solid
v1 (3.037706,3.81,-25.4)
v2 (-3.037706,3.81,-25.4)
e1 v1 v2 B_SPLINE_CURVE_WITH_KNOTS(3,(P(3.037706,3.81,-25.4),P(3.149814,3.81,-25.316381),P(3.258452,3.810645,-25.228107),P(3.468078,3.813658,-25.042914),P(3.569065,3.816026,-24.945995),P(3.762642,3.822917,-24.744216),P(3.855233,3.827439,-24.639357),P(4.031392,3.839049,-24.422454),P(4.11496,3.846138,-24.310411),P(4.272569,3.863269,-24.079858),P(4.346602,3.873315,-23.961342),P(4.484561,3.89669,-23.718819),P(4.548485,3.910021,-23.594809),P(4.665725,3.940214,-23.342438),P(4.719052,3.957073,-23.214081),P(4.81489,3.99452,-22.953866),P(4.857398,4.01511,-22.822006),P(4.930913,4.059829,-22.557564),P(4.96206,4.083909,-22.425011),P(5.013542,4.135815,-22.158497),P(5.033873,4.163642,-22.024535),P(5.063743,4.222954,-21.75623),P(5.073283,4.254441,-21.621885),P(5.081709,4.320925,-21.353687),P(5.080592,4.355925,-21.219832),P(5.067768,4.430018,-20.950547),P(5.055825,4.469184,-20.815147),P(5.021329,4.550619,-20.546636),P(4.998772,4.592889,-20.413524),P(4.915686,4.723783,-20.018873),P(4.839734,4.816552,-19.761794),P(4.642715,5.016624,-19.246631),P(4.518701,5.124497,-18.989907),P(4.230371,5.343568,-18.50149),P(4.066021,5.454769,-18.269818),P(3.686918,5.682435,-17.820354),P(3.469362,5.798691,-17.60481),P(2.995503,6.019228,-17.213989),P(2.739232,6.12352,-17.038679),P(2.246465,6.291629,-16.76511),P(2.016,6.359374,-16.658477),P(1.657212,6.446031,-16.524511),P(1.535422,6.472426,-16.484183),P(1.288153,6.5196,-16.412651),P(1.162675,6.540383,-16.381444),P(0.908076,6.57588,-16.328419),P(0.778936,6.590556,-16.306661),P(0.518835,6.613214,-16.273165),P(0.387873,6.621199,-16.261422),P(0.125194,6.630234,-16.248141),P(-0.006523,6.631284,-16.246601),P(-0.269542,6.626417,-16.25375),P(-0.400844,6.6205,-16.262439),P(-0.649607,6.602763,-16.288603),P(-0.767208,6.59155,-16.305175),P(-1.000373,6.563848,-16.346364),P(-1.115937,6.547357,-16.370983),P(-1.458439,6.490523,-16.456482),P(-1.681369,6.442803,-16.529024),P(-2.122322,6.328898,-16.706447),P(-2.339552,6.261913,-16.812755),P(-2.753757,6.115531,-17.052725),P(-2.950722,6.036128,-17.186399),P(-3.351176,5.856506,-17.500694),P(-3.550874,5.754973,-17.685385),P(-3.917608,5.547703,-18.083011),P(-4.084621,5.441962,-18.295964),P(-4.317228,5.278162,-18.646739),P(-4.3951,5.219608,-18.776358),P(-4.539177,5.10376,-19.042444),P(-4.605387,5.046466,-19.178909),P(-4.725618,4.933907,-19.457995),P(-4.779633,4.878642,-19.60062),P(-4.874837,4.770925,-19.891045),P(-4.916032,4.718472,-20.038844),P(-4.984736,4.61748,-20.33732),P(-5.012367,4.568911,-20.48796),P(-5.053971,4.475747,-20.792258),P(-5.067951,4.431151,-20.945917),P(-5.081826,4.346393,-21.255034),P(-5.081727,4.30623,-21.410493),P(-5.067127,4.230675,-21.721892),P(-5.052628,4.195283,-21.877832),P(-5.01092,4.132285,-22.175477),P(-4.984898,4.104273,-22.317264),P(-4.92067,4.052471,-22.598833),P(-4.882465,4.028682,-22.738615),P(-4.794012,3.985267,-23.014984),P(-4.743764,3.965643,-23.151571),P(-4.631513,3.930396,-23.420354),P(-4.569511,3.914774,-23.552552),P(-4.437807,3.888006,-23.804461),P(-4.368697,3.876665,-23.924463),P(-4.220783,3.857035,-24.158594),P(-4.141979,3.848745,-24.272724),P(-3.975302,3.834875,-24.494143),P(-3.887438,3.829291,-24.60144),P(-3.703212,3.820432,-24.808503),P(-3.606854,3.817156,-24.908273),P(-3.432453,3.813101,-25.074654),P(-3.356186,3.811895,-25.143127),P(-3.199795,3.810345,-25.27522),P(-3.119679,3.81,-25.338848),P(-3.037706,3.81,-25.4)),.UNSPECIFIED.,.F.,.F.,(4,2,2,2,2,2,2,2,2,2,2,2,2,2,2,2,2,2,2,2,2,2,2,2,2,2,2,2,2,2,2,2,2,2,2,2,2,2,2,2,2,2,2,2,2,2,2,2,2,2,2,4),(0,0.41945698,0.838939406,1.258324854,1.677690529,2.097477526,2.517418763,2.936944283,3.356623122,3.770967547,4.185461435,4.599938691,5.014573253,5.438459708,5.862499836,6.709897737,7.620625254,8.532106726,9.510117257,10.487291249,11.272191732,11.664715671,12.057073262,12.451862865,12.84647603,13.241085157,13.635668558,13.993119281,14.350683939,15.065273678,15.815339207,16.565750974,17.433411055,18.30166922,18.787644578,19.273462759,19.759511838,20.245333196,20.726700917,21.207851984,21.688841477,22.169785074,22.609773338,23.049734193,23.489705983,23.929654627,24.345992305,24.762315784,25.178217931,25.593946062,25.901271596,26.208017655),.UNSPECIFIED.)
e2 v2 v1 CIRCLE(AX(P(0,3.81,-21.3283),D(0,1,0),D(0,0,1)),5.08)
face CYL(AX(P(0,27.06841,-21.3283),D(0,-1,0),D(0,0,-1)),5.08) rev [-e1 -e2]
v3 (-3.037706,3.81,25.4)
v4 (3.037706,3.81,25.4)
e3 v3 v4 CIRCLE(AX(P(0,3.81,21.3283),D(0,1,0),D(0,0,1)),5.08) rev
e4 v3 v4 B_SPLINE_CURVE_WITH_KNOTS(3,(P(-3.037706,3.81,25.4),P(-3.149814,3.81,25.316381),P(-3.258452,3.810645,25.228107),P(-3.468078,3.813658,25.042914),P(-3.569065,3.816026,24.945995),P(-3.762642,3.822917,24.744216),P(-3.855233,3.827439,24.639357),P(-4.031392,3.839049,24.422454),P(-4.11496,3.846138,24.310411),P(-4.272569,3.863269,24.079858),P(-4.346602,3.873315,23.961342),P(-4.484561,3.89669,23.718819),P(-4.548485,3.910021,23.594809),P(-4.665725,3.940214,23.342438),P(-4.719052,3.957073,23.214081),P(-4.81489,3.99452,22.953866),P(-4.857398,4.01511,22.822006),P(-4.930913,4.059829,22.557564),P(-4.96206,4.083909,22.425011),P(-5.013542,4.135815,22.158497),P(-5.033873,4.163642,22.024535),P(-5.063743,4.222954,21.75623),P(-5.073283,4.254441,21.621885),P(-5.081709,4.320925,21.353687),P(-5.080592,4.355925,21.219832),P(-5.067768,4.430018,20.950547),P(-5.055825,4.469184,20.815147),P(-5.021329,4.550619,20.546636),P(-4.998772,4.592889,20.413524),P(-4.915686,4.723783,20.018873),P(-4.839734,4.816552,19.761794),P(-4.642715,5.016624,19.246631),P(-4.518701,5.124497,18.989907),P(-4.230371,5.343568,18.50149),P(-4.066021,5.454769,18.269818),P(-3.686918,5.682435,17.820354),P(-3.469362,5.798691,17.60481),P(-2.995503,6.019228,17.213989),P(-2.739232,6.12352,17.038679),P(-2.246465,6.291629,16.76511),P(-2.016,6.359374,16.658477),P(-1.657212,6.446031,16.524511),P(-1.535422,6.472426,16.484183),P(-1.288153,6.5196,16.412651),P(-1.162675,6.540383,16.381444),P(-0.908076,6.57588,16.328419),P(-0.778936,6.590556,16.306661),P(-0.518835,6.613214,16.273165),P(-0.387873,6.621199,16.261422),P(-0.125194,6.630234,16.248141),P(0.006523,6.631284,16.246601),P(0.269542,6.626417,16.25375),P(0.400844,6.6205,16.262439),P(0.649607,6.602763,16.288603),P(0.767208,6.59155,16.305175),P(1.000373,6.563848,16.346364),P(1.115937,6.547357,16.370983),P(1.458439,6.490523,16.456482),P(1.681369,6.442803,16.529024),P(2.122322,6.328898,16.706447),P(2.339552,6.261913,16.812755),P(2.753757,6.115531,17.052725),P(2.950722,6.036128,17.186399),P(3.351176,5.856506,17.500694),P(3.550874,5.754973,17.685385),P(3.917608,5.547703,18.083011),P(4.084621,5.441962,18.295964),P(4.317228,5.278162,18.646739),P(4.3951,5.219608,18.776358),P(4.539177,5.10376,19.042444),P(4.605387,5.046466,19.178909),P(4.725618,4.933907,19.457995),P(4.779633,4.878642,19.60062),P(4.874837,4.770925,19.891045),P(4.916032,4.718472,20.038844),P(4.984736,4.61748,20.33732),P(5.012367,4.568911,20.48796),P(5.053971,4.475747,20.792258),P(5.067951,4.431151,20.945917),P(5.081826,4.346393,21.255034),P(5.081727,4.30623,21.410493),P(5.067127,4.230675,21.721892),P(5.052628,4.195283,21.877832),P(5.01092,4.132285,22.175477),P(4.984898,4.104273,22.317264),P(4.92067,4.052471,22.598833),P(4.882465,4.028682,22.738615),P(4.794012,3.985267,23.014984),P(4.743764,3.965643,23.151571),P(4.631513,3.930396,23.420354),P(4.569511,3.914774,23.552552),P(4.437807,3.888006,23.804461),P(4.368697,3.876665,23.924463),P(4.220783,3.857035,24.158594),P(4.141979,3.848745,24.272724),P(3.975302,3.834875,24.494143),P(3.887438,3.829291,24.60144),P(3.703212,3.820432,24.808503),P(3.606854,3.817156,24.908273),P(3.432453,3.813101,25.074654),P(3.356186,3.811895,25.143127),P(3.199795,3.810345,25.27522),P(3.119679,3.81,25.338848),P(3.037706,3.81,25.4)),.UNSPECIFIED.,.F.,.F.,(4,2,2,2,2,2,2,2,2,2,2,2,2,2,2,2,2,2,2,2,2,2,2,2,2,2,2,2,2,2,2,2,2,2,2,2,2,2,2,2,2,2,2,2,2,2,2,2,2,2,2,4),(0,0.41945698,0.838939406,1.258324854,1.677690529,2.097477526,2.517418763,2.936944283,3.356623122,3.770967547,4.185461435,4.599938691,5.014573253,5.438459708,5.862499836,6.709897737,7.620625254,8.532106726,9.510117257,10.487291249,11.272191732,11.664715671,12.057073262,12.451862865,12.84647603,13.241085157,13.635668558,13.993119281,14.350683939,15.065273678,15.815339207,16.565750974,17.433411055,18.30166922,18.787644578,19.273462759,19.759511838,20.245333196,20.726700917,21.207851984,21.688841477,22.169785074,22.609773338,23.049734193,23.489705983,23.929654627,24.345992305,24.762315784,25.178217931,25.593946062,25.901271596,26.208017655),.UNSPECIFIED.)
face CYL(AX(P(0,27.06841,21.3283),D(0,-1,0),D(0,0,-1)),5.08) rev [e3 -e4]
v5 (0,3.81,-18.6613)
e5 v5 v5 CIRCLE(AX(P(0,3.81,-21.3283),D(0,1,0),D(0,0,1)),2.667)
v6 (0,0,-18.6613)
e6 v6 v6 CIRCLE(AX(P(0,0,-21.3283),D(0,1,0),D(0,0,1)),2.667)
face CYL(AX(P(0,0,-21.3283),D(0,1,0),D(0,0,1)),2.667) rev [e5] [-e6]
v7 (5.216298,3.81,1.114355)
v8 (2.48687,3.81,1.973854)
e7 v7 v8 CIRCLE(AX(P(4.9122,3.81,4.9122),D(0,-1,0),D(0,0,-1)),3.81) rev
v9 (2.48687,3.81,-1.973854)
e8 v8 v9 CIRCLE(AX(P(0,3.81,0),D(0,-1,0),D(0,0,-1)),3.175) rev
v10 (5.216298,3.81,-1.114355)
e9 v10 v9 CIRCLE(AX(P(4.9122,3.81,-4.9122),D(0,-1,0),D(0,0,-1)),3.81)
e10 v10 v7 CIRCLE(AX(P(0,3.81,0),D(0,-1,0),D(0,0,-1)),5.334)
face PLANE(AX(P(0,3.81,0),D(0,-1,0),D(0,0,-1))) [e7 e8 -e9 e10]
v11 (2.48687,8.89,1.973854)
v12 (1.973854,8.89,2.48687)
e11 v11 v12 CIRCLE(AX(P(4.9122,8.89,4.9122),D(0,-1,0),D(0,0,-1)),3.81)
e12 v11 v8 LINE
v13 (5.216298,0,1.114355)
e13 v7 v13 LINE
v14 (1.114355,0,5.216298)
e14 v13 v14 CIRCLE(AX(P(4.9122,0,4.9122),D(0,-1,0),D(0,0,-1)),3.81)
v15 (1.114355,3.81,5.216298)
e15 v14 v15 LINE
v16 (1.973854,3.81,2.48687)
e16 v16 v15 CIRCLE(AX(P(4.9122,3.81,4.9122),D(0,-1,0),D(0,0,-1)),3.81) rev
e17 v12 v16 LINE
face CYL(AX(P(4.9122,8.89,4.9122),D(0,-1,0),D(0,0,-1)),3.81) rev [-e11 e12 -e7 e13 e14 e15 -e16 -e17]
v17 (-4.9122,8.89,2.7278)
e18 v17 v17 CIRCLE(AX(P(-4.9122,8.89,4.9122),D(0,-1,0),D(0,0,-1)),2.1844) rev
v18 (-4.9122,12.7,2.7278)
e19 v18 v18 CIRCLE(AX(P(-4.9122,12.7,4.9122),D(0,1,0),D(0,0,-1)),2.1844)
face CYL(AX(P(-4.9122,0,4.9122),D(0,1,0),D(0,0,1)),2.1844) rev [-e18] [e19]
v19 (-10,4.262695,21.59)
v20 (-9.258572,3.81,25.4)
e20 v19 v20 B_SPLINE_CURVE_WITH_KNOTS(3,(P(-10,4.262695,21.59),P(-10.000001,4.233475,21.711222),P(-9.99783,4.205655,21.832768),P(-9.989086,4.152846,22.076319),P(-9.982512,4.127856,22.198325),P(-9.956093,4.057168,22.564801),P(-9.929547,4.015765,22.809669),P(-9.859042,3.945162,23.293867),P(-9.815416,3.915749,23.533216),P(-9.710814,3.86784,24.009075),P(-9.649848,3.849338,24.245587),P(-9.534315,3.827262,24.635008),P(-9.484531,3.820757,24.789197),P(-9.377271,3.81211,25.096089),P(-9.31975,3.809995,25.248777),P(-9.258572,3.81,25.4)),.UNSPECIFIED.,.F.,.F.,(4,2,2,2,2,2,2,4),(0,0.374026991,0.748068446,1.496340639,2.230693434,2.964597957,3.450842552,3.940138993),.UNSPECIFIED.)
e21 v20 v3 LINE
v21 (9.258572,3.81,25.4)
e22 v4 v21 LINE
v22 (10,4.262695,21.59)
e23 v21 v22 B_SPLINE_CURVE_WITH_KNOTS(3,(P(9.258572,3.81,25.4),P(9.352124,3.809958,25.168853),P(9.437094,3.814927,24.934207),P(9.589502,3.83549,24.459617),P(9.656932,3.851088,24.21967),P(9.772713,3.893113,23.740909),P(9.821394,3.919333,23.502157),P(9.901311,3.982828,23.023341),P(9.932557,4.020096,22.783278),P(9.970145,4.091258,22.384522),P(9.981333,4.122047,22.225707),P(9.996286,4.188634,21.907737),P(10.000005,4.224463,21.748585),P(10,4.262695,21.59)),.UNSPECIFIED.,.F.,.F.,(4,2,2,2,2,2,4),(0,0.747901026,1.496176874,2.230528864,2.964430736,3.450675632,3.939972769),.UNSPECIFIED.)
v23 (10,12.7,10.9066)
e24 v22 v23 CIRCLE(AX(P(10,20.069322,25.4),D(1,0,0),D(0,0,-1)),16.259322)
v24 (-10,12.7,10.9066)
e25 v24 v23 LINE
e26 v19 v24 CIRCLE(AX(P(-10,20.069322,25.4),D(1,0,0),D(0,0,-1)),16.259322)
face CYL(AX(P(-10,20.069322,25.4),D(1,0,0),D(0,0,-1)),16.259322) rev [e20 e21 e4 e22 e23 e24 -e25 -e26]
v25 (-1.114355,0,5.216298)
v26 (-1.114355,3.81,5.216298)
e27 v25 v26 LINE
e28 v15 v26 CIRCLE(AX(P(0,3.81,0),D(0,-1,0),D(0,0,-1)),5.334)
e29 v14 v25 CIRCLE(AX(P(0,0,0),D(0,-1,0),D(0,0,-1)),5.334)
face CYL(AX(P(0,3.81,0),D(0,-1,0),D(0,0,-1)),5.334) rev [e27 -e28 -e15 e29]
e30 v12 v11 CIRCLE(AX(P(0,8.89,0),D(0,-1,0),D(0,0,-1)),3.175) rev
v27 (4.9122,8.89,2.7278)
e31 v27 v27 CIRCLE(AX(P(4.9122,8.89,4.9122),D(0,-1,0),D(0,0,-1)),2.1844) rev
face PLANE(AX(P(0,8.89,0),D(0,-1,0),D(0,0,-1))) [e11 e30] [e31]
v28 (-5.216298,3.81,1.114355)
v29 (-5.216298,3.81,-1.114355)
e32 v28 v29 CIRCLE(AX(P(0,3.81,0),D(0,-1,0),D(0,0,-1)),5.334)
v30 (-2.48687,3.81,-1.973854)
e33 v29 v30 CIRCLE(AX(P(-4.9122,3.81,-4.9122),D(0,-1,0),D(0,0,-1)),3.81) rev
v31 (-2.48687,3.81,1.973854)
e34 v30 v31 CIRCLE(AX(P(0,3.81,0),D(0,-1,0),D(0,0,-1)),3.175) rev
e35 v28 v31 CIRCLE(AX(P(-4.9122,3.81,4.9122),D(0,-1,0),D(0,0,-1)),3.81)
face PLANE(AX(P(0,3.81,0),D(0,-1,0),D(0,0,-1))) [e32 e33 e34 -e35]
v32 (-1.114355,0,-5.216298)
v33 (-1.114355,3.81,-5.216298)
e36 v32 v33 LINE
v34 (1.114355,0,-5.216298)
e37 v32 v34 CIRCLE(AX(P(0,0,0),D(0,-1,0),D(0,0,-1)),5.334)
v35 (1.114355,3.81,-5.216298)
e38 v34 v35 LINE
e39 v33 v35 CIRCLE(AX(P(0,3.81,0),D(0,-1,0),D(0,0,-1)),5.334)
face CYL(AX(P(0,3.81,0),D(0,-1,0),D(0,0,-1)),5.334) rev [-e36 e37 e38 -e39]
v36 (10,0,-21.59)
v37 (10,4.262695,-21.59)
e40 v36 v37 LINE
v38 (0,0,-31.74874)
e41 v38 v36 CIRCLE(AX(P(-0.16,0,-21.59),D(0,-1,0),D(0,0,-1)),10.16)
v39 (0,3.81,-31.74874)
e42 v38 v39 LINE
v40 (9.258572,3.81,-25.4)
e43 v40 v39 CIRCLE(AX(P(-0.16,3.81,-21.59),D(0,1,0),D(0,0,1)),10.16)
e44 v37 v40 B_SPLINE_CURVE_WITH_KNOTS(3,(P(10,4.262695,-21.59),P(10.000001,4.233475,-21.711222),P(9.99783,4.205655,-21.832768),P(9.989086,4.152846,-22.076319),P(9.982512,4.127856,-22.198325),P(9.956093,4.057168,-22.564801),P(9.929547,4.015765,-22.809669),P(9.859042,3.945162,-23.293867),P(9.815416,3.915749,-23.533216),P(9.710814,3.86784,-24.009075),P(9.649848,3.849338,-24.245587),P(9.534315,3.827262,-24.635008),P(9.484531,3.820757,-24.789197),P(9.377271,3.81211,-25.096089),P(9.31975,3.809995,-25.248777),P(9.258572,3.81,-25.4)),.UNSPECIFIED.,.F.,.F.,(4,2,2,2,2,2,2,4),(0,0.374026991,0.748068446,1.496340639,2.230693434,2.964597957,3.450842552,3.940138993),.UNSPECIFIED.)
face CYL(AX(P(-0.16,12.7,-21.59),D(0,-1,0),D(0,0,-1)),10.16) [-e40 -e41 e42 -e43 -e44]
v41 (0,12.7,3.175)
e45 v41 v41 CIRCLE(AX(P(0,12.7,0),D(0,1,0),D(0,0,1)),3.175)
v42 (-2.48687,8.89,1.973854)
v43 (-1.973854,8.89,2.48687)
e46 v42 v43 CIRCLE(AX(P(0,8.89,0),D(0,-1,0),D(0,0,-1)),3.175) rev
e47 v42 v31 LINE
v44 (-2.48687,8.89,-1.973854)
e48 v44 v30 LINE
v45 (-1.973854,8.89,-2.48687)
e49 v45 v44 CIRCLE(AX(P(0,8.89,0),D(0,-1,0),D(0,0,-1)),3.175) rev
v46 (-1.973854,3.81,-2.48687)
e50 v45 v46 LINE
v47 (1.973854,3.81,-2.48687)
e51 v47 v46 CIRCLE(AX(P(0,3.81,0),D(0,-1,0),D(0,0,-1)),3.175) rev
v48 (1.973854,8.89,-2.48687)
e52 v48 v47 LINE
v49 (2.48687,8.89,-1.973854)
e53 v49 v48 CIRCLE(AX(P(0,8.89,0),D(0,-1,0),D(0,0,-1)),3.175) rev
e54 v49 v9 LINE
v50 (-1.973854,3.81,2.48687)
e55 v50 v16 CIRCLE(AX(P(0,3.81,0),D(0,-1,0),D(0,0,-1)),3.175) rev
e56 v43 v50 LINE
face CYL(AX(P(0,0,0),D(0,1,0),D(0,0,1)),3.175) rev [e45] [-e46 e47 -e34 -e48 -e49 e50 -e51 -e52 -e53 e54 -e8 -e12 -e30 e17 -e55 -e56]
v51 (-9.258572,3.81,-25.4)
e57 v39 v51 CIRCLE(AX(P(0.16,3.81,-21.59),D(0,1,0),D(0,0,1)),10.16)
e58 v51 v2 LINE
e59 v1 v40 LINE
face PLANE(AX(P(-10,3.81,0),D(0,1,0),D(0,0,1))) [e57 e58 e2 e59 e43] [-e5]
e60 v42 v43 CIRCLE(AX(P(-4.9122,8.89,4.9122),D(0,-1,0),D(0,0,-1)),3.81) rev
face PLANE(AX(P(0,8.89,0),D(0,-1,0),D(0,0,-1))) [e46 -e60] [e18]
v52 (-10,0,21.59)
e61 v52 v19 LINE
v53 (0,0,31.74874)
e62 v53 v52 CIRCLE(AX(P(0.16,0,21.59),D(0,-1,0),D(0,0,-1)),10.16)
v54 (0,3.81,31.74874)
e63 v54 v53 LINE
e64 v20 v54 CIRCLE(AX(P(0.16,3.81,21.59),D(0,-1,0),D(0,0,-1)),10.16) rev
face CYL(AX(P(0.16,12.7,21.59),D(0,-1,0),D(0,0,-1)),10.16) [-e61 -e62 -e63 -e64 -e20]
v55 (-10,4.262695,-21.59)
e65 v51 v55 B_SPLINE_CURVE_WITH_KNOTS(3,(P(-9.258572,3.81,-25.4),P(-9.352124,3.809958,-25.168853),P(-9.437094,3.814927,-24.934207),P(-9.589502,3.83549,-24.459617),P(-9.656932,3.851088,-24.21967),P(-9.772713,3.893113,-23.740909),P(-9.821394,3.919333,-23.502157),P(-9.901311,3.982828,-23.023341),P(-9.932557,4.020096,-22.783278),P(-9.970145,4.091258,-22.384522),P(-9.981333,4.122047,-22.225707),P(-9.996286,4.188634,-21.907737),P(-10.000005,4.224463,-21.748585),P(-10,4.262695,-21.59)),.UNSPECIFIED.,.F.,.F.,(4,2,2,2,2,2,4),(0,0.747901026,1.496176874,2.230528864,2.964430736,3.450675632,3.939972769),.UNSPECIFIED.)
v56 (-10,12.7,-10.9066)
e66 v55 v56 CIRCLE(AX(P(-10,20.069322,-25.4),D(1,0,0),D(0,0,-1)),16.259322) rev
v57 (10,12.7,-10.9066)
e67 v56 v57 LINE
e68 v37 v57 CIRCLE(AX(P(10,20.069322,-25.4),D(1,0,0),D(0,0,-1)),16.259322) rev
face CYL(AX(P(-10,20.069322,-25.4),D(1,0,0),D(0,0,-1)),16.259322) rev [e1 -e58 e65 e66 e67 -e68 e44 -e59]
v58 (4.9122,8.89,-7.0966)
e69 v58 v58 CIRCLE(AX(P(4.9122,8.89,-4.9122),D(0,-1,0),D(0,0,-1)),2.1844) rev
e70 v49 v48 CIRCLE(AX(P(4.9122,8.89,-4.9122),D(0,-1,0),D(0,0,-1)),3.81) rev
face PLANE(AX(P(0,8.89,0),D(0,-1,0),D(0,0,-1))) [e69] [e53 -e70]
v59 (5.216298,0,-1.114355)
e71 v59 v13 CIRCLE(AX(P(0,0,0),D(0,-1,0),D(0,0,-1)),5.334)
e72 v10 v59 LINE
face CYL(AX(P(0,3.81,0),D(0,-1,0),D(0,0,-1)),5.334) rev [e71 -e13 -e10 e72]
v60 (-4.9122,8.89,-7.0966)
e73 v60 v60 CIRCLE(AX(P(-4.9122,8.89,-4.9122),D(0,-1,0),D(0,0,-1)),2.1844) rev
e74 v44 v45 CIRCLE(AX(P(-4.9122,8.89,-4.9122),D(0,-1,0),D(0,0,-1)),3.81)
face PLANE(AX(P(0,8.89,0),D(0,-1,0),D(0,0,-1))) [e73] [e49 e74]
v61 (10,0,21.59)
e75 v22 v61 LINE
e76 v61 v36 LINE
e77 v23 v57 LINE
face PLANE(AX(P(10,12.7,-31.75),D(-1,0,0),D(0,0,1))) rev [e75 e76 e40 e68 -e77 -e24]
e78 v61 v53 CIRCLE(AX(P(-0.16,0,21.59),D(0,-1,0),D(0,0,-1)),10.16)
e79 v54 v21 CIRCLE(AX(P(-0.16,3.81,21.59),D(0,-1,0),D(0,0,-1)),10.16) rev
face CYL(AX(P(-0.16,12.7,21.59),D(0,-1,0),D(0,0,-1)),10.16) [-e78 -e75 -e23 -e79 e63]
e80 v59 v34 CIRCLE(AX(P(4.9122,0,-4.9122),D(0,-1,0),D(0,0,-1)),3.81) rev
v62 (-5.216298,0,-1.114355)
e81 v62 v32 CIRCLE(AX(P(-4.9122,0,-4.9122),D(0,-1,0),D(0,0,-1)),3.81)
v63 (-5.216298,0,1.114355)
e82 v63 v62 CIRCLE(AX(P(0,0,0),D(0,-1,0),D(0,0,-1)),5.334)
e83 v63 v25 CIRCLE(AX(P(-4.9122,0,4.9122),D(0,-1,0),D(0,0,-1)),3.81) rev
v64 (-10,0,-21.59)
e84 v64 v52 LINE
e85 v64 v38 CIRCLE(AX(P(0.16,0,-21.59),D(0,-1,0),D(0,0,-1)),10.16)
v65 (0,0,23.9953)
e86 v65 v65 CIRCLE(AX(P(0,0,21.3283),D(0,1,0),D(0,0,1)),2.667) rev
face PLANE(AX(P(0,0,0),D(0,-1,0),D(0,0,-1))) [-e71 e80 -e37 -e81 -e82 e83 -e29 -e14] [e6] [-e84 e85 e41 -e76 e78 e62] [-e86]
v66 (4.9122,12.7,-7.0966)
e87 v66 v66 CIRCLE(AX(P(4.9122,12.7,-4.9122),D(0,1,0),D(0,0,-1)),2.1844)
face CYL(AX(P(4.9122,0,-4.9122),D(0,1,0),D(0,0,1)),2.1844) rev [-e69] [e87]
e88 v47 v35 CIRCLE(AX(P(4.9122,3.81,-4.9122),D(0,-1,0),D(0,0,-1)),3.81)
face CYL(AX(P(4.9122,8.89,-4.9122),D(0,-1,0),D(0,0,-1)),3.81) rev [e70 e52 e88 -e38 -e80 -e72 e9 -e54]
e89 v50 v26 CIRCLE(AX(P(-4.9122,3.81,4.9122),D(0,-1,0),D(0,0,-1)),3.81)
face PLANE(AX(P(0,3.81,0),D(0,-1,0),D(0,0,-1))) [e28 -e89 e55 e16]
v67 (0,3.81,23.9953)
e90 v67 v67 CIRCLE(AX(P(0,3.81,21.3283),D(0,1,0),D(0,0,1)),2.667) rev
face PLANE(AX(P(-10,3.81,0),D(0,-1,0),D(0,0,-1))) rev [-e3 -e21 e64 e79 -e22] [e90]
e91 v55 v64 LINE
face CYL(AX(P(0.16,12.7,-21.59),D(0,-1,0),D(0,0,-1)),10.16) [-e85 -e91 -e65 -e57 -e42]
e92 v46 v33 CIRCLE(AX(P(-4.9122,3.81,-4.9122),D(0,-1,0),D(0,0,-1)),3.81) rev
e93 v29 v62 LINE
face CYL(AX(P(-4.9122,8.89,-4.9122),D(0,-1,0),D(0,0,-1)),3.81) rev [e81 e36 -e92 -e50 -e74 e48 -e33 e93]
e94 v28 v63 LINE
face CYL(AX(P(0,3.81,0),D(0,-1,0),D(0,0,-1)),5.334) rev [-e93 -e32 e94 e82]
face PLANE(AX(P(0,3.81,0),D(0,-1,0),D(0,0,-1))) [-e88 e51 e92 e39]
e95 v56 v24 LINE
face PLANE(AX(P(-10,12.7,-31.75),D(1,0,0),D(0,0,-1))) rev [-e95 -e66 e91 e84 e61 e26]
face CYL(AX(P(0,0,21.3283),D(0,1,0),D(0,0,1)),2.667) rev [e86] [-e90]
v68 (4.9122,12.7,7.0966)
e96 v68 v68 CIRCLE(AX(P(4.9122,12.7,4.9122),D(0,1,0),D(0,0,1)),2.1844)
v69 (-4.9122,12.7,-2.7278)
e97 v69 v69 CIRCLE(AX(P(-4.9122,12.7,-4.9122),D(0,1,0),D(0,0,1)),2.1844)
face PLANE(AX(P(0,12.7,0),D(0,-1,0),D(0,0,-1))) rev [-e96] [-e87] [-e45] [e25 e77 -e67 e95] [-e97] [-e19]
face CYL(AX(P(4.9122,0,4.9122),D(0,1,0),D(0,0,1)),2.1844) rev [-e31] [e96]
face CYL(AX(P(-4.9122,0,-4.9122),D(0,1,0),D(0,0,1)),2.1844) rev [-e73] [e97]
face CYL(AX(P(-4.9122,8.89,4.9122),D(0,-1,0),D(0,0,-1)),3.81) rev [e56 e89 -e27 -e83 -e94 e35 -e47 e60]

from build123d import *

# Parameters (mm, degrees)
SKETCH1_W               = 20
SKETCH1_H               = 63.5
BOSS_EXTRUDE1_DEPTH     = 12.7
SKETCH2_R               = 3.175
SKETCH2_R_2             = 2.1844
CUT_EXTRUDE1_DEPTH      = 36.62797356
CUT_EXTRUDE2_DEPTH      = 36.62797356
CUT_EXTRUDE2_DEPTH_BACK = 36.62797356
SKETCH4_R               = 3.81
CUT_EXTRUDE3_DEPTH      = 8.89
SKETCH4_3_R             = 3.81
SKETCH4_3_R_2           = 2.1844
SKETCH4_3_R_3           = 5.334
SKETCH4_3_R_4           = 3.175
CUT_EXTRUDE4_DEPTH      = 3.81
SKETCH6_R               = 5.08
SKETCH6_R_2             = 2.667
CUT_EXTRUDE5_DEPTH      = 8.89
SKETCH6_4_R             = 2.667
CUT_EXTRUDE6_DEPTH      = 35.454239272
FILLET1_R               = 10.16


with BuildPart() as part:
    # Sketch1 → Boss-Extrude1 (new body)
    with BuildSketch(Plane(origin=(0, 0, 0), x_dir=(1, 0, 0), z_dir=(0, 1, 0))):
        Rectangle(SKETCH1_W, SKETCH1_H)
    extrude(amount=BOSS_EXTRUDE1_DEPTH)

    # Sketch2 → Cut-Extrude1 (cut, through all)
    with BuildSketch(Plane(origin=(0, 12.7, 0), x_dir=(1, 0, 0), z_dir=(0, 1, 0))):
        with Locations(Location((0, 0, 0), (0, 0, 270))):
            Circle(SKETCH2_R)
        with Locations(Location((-4.912200098, 4.912200098, 0), (0, 0, 270))):
            Circle(SKETCH2_R_2)
        with Locations(Location((4.912200098, -4.912200098, 0), (0, 0, 270))):
            Circle(SKETCH2_R_2)
        with Locations(Location((4.912200098, 4.912200098, 0), (0, 0, 90))):
            Circle(SKETCH2_R_2)
        with Locations(Location((-4.912200098, -4.912200098, 0), (0, 0, 90))):
            Circle(SKETCH2_R_2)
    extrude(amount=-CUT_EXTRUDE1_DEPTH, mode=Mode.SUBTRACT)

    # Sketch3 → Cut-Extrude2 (cut, two sides: drawn at the far end of the back side and taken through both)
    with BuildSketch(Plane(origin=(0, 0, 0), x_dir=(0, 0, -1), z_dir=(1, 0, 0)).offset(-CUT_EXTRUDE2_DEPTH_BACK)):
        with BuildLine():
            Line((31.75, 3.81), (31.75, 12.7))
            Line((31.75, 12.7), (10.906600098, 12.7))
            ThreePointArc((10.906600098, 12.7), (16.898665682, 6.209564949), (25.4, 3.81))
            Line((25.4, 3.81), (31.75, 3.81))
        make_face()
        with BuildLine():
            ThreePointArc((-25.4, 3.81), (-16.898665682, 6.209564949), (-10.906600098, 12.7))
            Line((-10.906600098, 12.7), (-31.75, 12.7))
            Line((-31.75, 12.7), (-31.75, 3.81))
            Line((-31.75, 3.81), (-25.4, 3.81))
        make_face()
    extrude(amount=CUT_EXTRUDE2_DEPTH + CUT_EXTRUDE2_DEPTH_BACK, mode=Mode.SUBTRACT)

    # Sketch4 → Cut-Extrude3 (cut)
    with BuildSketch(Plane.XZ):
        with Locations((-4.912200098, -4.912200098)):
            Circle(SKETCH4_R)
        with Locations((4.912200098, 4.912200098)):
            Circle(SKETCH4_R)
        with Locations((-4.912200098, 4.912200098)):
            Circle(SKETCH4_R)
        with Locations((4.912200098, -4.912200098)):
            Circle(SKETCH4_R)
    extrude(amount=-CUT_EXTRUDE3_DEPTH, mode=Mode.SUBTRACT)

    # Sketch4<3> → Cut-Extrude4 (cut)
    # profile 1 of 28: a face of its own
    with BuildSketch(Plane.XZ):
        with Locations((-4.912200098, 4.912200098)):
            Circle(SKETCH4_3_R)
        with Locations(Location((-4.912200098, 4.912200098, 0), (0, 0, 270))):
            Circle(SKETCH4_3_R_2, mode=Mode.SUBTRACT)
    # profile 2 of 28: a face of its own
    with BuildSketch(Plane.XZ):
        Circle(SKETCH4_3_R_3)
        with Locations(Location((0, 0, 0), (0, 0, 90))):
            Circle(SKETCH4_3_R_4, mode=Mode.SUBTRACT)
    # profile 3 of 28: a face of its own
    with BuildSketch(Plane.XZ):
        Circle(SKETCH4_3_R_3)
    # profile 4 of 28: a face of its own
    with BuildSketch(Plane.XZ):
        with Locations(Location((-4.912200098, 4.912200098, 0), (0, 0, 270))):
            Circle(SKETCH4_3_R_2)
    # profile 5 of 28: a face of its own
    with BuildSketch(Plane.XZ):
        with Locations((-4.912200098, 4.912200098)):
            Circle(SKETCH4_3_R)
    # profile 6 of 28: a face of its own
    with BuildSketch(Plane.XZ):
        Circle(SKETCH4_3_R_3)
        with Locations(Location((0, 0, 0), (0, 0, 90))):
            Circle(SKETCH4_3_R_4, mode=Mode.SUBTRACT)
    # profile 7 of 28: a face of its own
    with BuildSketch(Plane.XZ):
        with Locations((-4.912200098, -4.912200098)):
            Circle(SKETCH4_3_R)
    # profile 8 of 28: a face of its own
    with BuildSketch(Plane.XZ):
        Circle(SKETCH4_3_R_3)
        with Locations(Location((0, 0, 0), (0, 0, 90))):
            Circle(SKETCH4_3_R_4, mode=Mode.SUBTRACT)
    # profile 9 of 28: a face of its own
    with BuildSketch(Plane.XZ):
        with Locations((-4.912200098, -4.912200098)):
            Circle(SKETCH4_3_R)
        with Locations(Location((-4.912200098, -4.912200098, 0), (0, 0, 90))):
            Circle(SKETCH4_3_R_2, mode=Mode.SUBTRACT)
    # profile 10 of 28: a face of its own
    with BuildSketch(Plane.XZ):
        Circle(SKETCH4_3_R_3)
    # profile 11 of 28: a face of its own
    with BuildSketch(Plane.XZ):
        with Locations(Location((-4.912200098, -4.912200098, 0), (0, 0, 90))):
            Circle(SKETCH4_3_R_2)
    # profile 12 of 28: a face of its own
    with BuildSketch(Plane.XZ):
        with BuildLine():
            ThreePointArc((1.973854475, -2.486870224), (1.04518229, -2.998035854), (0, -3.175))
            Line((0, -3.175), (0, -5.334))
            ThreePointArc((0, -5.334), (0.560277089, -5.304492962), (1.114355409, -5.216298306))
            ThreePointArc((1.114355409, -5.216298306), (1.278123958, -3.767826643), (1.973854475, -2.486870224))
        make_face()
    # profile 13 of 28: a face of its own
    with BuildSketch(Plane.XZ):
        with BuildLine():
            Line((0, -5.334), (0, -3.175))
            ThreePointArc((0, -3.175), (-1.04518229, -2.998035854), (-1.973854475, -2.486870224))
            ThreePointArc((-1.973854475, -2.486870224), (-1.326729639, -3.623595587), (-1.102200098, -4.912200098))
            ThreePointArc((-1.102200098, -4.912200098), (-1.105240139, -5.064370621), (-1.114355409, -5.216298306))
            ThreePointArc((-1.114355409, -5.216298306), (-0.560277089, -5.304492962), (0, -5.334))
        make_face()
    # profile 14 of 28: a face of its own
    with BuildSketch(Plane.XZ):
        with Locations((4.912200098, -4.912200098)):
            Circle(SKETCH4_3_R)
        with Locations(Location((4.912200098, -4.912200098, 0), (0, 0, 270))):
            Circle(SKETCH4_3_R_2, mode=Mode.SUBTRACT)
    # profile 15 of 28: a face of its own
    with BuildSketch(Plane.XZ):
        Circle(SKETCH4_3_R_3)
        with Locations(Location((0, 0, 0), (0, 0, 90))):
            Circle(SKETCH4_3_R_4, mode=Mode.SUBTRACT)
    # profile 16 of 28: a face of its own
    with BuildSketch(Plane.XZ):
        Circle(SKETCH4_3_R_3)
    # profile 17 of 28: a face of its own
    with BuildSketch(Plane.XZ):
        with Locations(Location((4.912200098, -4.912200098, 0), (0, 0, 270))):
            Circle(SKETCH4_3_R_2)
    # profile 18 of 28: a face of its own
    with BuildSketch(Plane.XZ):
        with Locations((4.912200098, -4.912200098)):
            Circle(SKETCH4_3_R)
    # profile 19 of 28: a face of its own
    with BuildSketch(Plane.XZ):
        Circle(SKETCH4_3_R_3)
        with Locations(Location((0, 0, 0), (0, 0, 90))):
            Circle(SKETCH4_3_R_4, mode=Mode.SUBTRACT)
    # profile 20 of 28: a face of its own
    with BuildSketch(Plane.XZ):
        with Locations((4.912200098, 4.912200098)):
            Circle(SKETCH4_3_R)
    # profile 21 of 28: a face of its own
    with BuildSketch(Plane.XZ):
        Circle(SKETCH4_3_R_3)
        with Locations(Location((0, 0, 0), (0, 0, 90))):
            Circle(SKETCH4_3_R_4, mode=Mode.SUBTRACT)
    # profile 22 of 28: a face of its own
    with BuildSketch(Plane.XZ):
        with Locations((4.912200098, 4.912200098)):
            Circle(SKETCH4_3_R)
        with Locations(Location((4.912200098, 4.912200098, 0), (0, 0, 90))):
            Circle(SKETCH4_3_R_2, mode=Mode.SUBTRACT)
    # profile 23 of 28: a face of its own
    with BuildSketch(Plane.XZ):
        Circle(SKETCH4_3_R_3)
    # profile 24 of 28: a face of its own
    with BuildSketch(Plane.XZ):
        with Locations(Location((4.912200098, 4.912200098, 0), (0, 0, 90))):
            Circle(SKETCH4_3_R_2)
    # profile 25 of 28: a face of its own
    with BuildSketch(Plane.XZ):
        with BuildLine():
            Line((0, 3.175), (0, 5.334))
            ThreePointArc((0, 5.334), (-0.560277089, 5.304492962), (-1.114355409, 5.216298306))
            ThreePointArc((-1.114355409, 5.216298306), (-1.105240139, 5.064370621), (-1.102200098, 4.912200098))
            ThreePointArc((-1.102200098, 4.912200098), (-1.326729639, 3.623595587), (-1.973854475, 2.486870224))
            ThreePointArc((-1.973854475, 2.486870224), (-1.04518229, 2.998035854), (0, 3.175))
        make_face()
    # profile 26 of 28: a face of its own
    with BuildSketch(Plane.XZ):
        with BuildLine():
            ThreePointArc((1.114355409, 5.216298306), (0.560277089, 5.304492962), (0, 5.334))
            Line((0, 5.334), (0, 3.175))
            ThreePointArc((0, 3.175), (1.04518229, 2.998035854), (1.973854475, 2.486870224))
            ThreePointArc((1.973854475, 2.486870224), (1.278123958, 3.767826643), (1.114355409, 5.216298306))
        make_face()
    # profile 27 of 28: a face of its own
    with BuildSketch(Plane.XZ):
        with BuildLine():
            ThreePointArc((1.973854475, 2.486870224), (1.04518229, 2.998035854), (0, 3.175))
            Line((0, 3.175), (0, -3.175))
            ThreePointArc((0, -3.175), (1.04518229, -2.998035854), (1.973854475, -2.486870224))
            ThreePointArc((1.973854475, -2.486870224), (2.218123262, -2.218123262), (2.486870224, -1.973854475))
            ThreePointArc((2.486870224, -1.973854475), (2.998035854, -1.04518229), (3.175, 0))
            ThreePointArc((3.175, 0), (2.998035854, 1.04518229), (2.486870224, 1.973854475))
            ThreePointArc((2.486870224, 1.973854475), (2.218123262, 2.218123262), (1.973854475, 2.486870224))
        make_face()
    # profile 28 of 28: a face of its own
    with BuildSketch(Plane.XZ):
        with BuildLine():
            Line((0, -3.175), (0, 3.175))
            ThreePointArc((0, 3.175), (-1.04518229, 2.998035854), (-1.973854475, 2.486870224))
            ThreePointArc((-1.973854475, 2.486870224), (-2.218123262, 2.218123262), (-2.486870224, 1.973854475))
            ThreePointArc((-2.486870224, 1.973854475), (-3.175, 0), (-2.486870224, -1.973854475))
            ThreePointArc((-2.486870224, -1.973854475), (-2.218123262, -2.218123262), (-1.973854475, -2.486870224))
            ThreePointArc((-1.973854475, -2.486870224), (-1.04518229, -2.998035854), (0, -3.175))
        make_face()
    extrude(amount=-CUT_EXTRUDE4_DEPTH, mode=Mode.SUBTRACT)

    # Sketch6 → Cut-Extrude5 (cut)
    # profile 1 of 3: a face of its own
    with BuildSketch(Plane(origin=(0, 3.81, 0), x_dir=(1, 0, 0), z_dir=(0, 1, 0))):
        with Locations((0, -21.328300049)):
            Circle(SKETCH6_R)
        with Locations((0, -21.328300049)):
            Circle(SKETCH6_R_2, mode=Mode.SUBTRACT)
    # profile 2 of 3: a face of its own
    with BuildSketch(Plane(origin=(0, 3.81, 0), x_dir=(1, 0, 0), z_dir=(0, 1, 0))):
        with Locations((0, -21.328300049)):
            Circle(SKETCH6_R_2)
    # profile 3 of 3: a face of its own
    with BuildSketch(Plane(origin=(0, 3.81, 0), x_dir=(1, 0, 0), z_dir=(0, 1, 0))):
        with Locations((0, 21.328300049)):
            Circle(SKETCH6_R)
    extrude(amount=CUT_EXTRUDE5_DEPTH, mode=Mode.SUBTRACT)

    # Sketch6<4> → Cut-Extrude6 (cut, through all)
    with BuildSketch(Plane(origin=(0, 3.81, 0), x_dir=(1, 0, 0), z_dir=(0, 1, 0))):
        with Locations(Location((0, 21.328300049, 0), (0, 0, 270))):
            Circle(SKETCH6_4_R)
        with Locations(Location((0, -21.328300049, 0), (0, 0, 270))):
            Circle(SKETCH6_4_R)
    extrude(amount=-CUT_EXTRUDE6_DEPTH, mode=Mode.SUBTRACT)

    # Fillet1
    # the kernel refuses this fillet: 10.16 mm, written as the material it takes off along each edge
    with BuildSketch(Plane(origin=(10, -25.4, 31.75), x_dir=(0, 0, -1), z_dir=(0, 1, 0)), Plane(origin=(10, -25.4, -31.75), x_dir=(-1, 0, 0), z_dir=(0, 1, 0))) as fillet1_piece_1:
        with BuildLine():
            CenterArc((FILLET1_R, FILLET1_R), FILLET1_R, 180, 90)
            Line((0, FILLET1_R), (0, 0))
            Line((0, 0), (FILLET1_R, 0))
        make_face()
    extrude(amount=54.61, mode=Mode.SUBTRACT)
    with BuildSketch(Plane(origin=(-10, -25.4, 31.75), x_dir=(0, 0, -1), z_dir=(0, 1, 0)), Plane(origin=(-10, -25.4, -31.75), x_dir=(1, 0, 0), z_dir=(0, 1, 0))) as fillet1_piece_2:
        with BuildLine():
            CenterArc((FILLET1_R, -FILLET1_R), FILLET1_R, 90, 90)
            Line((0, -FILLET1_R), (0, 0))
            Line((0, 0), (FILLET1_R, 0))
        make_face()
    extrude(amount=54.61, mode=Mode.SUBTRACT)


solid = part.part
